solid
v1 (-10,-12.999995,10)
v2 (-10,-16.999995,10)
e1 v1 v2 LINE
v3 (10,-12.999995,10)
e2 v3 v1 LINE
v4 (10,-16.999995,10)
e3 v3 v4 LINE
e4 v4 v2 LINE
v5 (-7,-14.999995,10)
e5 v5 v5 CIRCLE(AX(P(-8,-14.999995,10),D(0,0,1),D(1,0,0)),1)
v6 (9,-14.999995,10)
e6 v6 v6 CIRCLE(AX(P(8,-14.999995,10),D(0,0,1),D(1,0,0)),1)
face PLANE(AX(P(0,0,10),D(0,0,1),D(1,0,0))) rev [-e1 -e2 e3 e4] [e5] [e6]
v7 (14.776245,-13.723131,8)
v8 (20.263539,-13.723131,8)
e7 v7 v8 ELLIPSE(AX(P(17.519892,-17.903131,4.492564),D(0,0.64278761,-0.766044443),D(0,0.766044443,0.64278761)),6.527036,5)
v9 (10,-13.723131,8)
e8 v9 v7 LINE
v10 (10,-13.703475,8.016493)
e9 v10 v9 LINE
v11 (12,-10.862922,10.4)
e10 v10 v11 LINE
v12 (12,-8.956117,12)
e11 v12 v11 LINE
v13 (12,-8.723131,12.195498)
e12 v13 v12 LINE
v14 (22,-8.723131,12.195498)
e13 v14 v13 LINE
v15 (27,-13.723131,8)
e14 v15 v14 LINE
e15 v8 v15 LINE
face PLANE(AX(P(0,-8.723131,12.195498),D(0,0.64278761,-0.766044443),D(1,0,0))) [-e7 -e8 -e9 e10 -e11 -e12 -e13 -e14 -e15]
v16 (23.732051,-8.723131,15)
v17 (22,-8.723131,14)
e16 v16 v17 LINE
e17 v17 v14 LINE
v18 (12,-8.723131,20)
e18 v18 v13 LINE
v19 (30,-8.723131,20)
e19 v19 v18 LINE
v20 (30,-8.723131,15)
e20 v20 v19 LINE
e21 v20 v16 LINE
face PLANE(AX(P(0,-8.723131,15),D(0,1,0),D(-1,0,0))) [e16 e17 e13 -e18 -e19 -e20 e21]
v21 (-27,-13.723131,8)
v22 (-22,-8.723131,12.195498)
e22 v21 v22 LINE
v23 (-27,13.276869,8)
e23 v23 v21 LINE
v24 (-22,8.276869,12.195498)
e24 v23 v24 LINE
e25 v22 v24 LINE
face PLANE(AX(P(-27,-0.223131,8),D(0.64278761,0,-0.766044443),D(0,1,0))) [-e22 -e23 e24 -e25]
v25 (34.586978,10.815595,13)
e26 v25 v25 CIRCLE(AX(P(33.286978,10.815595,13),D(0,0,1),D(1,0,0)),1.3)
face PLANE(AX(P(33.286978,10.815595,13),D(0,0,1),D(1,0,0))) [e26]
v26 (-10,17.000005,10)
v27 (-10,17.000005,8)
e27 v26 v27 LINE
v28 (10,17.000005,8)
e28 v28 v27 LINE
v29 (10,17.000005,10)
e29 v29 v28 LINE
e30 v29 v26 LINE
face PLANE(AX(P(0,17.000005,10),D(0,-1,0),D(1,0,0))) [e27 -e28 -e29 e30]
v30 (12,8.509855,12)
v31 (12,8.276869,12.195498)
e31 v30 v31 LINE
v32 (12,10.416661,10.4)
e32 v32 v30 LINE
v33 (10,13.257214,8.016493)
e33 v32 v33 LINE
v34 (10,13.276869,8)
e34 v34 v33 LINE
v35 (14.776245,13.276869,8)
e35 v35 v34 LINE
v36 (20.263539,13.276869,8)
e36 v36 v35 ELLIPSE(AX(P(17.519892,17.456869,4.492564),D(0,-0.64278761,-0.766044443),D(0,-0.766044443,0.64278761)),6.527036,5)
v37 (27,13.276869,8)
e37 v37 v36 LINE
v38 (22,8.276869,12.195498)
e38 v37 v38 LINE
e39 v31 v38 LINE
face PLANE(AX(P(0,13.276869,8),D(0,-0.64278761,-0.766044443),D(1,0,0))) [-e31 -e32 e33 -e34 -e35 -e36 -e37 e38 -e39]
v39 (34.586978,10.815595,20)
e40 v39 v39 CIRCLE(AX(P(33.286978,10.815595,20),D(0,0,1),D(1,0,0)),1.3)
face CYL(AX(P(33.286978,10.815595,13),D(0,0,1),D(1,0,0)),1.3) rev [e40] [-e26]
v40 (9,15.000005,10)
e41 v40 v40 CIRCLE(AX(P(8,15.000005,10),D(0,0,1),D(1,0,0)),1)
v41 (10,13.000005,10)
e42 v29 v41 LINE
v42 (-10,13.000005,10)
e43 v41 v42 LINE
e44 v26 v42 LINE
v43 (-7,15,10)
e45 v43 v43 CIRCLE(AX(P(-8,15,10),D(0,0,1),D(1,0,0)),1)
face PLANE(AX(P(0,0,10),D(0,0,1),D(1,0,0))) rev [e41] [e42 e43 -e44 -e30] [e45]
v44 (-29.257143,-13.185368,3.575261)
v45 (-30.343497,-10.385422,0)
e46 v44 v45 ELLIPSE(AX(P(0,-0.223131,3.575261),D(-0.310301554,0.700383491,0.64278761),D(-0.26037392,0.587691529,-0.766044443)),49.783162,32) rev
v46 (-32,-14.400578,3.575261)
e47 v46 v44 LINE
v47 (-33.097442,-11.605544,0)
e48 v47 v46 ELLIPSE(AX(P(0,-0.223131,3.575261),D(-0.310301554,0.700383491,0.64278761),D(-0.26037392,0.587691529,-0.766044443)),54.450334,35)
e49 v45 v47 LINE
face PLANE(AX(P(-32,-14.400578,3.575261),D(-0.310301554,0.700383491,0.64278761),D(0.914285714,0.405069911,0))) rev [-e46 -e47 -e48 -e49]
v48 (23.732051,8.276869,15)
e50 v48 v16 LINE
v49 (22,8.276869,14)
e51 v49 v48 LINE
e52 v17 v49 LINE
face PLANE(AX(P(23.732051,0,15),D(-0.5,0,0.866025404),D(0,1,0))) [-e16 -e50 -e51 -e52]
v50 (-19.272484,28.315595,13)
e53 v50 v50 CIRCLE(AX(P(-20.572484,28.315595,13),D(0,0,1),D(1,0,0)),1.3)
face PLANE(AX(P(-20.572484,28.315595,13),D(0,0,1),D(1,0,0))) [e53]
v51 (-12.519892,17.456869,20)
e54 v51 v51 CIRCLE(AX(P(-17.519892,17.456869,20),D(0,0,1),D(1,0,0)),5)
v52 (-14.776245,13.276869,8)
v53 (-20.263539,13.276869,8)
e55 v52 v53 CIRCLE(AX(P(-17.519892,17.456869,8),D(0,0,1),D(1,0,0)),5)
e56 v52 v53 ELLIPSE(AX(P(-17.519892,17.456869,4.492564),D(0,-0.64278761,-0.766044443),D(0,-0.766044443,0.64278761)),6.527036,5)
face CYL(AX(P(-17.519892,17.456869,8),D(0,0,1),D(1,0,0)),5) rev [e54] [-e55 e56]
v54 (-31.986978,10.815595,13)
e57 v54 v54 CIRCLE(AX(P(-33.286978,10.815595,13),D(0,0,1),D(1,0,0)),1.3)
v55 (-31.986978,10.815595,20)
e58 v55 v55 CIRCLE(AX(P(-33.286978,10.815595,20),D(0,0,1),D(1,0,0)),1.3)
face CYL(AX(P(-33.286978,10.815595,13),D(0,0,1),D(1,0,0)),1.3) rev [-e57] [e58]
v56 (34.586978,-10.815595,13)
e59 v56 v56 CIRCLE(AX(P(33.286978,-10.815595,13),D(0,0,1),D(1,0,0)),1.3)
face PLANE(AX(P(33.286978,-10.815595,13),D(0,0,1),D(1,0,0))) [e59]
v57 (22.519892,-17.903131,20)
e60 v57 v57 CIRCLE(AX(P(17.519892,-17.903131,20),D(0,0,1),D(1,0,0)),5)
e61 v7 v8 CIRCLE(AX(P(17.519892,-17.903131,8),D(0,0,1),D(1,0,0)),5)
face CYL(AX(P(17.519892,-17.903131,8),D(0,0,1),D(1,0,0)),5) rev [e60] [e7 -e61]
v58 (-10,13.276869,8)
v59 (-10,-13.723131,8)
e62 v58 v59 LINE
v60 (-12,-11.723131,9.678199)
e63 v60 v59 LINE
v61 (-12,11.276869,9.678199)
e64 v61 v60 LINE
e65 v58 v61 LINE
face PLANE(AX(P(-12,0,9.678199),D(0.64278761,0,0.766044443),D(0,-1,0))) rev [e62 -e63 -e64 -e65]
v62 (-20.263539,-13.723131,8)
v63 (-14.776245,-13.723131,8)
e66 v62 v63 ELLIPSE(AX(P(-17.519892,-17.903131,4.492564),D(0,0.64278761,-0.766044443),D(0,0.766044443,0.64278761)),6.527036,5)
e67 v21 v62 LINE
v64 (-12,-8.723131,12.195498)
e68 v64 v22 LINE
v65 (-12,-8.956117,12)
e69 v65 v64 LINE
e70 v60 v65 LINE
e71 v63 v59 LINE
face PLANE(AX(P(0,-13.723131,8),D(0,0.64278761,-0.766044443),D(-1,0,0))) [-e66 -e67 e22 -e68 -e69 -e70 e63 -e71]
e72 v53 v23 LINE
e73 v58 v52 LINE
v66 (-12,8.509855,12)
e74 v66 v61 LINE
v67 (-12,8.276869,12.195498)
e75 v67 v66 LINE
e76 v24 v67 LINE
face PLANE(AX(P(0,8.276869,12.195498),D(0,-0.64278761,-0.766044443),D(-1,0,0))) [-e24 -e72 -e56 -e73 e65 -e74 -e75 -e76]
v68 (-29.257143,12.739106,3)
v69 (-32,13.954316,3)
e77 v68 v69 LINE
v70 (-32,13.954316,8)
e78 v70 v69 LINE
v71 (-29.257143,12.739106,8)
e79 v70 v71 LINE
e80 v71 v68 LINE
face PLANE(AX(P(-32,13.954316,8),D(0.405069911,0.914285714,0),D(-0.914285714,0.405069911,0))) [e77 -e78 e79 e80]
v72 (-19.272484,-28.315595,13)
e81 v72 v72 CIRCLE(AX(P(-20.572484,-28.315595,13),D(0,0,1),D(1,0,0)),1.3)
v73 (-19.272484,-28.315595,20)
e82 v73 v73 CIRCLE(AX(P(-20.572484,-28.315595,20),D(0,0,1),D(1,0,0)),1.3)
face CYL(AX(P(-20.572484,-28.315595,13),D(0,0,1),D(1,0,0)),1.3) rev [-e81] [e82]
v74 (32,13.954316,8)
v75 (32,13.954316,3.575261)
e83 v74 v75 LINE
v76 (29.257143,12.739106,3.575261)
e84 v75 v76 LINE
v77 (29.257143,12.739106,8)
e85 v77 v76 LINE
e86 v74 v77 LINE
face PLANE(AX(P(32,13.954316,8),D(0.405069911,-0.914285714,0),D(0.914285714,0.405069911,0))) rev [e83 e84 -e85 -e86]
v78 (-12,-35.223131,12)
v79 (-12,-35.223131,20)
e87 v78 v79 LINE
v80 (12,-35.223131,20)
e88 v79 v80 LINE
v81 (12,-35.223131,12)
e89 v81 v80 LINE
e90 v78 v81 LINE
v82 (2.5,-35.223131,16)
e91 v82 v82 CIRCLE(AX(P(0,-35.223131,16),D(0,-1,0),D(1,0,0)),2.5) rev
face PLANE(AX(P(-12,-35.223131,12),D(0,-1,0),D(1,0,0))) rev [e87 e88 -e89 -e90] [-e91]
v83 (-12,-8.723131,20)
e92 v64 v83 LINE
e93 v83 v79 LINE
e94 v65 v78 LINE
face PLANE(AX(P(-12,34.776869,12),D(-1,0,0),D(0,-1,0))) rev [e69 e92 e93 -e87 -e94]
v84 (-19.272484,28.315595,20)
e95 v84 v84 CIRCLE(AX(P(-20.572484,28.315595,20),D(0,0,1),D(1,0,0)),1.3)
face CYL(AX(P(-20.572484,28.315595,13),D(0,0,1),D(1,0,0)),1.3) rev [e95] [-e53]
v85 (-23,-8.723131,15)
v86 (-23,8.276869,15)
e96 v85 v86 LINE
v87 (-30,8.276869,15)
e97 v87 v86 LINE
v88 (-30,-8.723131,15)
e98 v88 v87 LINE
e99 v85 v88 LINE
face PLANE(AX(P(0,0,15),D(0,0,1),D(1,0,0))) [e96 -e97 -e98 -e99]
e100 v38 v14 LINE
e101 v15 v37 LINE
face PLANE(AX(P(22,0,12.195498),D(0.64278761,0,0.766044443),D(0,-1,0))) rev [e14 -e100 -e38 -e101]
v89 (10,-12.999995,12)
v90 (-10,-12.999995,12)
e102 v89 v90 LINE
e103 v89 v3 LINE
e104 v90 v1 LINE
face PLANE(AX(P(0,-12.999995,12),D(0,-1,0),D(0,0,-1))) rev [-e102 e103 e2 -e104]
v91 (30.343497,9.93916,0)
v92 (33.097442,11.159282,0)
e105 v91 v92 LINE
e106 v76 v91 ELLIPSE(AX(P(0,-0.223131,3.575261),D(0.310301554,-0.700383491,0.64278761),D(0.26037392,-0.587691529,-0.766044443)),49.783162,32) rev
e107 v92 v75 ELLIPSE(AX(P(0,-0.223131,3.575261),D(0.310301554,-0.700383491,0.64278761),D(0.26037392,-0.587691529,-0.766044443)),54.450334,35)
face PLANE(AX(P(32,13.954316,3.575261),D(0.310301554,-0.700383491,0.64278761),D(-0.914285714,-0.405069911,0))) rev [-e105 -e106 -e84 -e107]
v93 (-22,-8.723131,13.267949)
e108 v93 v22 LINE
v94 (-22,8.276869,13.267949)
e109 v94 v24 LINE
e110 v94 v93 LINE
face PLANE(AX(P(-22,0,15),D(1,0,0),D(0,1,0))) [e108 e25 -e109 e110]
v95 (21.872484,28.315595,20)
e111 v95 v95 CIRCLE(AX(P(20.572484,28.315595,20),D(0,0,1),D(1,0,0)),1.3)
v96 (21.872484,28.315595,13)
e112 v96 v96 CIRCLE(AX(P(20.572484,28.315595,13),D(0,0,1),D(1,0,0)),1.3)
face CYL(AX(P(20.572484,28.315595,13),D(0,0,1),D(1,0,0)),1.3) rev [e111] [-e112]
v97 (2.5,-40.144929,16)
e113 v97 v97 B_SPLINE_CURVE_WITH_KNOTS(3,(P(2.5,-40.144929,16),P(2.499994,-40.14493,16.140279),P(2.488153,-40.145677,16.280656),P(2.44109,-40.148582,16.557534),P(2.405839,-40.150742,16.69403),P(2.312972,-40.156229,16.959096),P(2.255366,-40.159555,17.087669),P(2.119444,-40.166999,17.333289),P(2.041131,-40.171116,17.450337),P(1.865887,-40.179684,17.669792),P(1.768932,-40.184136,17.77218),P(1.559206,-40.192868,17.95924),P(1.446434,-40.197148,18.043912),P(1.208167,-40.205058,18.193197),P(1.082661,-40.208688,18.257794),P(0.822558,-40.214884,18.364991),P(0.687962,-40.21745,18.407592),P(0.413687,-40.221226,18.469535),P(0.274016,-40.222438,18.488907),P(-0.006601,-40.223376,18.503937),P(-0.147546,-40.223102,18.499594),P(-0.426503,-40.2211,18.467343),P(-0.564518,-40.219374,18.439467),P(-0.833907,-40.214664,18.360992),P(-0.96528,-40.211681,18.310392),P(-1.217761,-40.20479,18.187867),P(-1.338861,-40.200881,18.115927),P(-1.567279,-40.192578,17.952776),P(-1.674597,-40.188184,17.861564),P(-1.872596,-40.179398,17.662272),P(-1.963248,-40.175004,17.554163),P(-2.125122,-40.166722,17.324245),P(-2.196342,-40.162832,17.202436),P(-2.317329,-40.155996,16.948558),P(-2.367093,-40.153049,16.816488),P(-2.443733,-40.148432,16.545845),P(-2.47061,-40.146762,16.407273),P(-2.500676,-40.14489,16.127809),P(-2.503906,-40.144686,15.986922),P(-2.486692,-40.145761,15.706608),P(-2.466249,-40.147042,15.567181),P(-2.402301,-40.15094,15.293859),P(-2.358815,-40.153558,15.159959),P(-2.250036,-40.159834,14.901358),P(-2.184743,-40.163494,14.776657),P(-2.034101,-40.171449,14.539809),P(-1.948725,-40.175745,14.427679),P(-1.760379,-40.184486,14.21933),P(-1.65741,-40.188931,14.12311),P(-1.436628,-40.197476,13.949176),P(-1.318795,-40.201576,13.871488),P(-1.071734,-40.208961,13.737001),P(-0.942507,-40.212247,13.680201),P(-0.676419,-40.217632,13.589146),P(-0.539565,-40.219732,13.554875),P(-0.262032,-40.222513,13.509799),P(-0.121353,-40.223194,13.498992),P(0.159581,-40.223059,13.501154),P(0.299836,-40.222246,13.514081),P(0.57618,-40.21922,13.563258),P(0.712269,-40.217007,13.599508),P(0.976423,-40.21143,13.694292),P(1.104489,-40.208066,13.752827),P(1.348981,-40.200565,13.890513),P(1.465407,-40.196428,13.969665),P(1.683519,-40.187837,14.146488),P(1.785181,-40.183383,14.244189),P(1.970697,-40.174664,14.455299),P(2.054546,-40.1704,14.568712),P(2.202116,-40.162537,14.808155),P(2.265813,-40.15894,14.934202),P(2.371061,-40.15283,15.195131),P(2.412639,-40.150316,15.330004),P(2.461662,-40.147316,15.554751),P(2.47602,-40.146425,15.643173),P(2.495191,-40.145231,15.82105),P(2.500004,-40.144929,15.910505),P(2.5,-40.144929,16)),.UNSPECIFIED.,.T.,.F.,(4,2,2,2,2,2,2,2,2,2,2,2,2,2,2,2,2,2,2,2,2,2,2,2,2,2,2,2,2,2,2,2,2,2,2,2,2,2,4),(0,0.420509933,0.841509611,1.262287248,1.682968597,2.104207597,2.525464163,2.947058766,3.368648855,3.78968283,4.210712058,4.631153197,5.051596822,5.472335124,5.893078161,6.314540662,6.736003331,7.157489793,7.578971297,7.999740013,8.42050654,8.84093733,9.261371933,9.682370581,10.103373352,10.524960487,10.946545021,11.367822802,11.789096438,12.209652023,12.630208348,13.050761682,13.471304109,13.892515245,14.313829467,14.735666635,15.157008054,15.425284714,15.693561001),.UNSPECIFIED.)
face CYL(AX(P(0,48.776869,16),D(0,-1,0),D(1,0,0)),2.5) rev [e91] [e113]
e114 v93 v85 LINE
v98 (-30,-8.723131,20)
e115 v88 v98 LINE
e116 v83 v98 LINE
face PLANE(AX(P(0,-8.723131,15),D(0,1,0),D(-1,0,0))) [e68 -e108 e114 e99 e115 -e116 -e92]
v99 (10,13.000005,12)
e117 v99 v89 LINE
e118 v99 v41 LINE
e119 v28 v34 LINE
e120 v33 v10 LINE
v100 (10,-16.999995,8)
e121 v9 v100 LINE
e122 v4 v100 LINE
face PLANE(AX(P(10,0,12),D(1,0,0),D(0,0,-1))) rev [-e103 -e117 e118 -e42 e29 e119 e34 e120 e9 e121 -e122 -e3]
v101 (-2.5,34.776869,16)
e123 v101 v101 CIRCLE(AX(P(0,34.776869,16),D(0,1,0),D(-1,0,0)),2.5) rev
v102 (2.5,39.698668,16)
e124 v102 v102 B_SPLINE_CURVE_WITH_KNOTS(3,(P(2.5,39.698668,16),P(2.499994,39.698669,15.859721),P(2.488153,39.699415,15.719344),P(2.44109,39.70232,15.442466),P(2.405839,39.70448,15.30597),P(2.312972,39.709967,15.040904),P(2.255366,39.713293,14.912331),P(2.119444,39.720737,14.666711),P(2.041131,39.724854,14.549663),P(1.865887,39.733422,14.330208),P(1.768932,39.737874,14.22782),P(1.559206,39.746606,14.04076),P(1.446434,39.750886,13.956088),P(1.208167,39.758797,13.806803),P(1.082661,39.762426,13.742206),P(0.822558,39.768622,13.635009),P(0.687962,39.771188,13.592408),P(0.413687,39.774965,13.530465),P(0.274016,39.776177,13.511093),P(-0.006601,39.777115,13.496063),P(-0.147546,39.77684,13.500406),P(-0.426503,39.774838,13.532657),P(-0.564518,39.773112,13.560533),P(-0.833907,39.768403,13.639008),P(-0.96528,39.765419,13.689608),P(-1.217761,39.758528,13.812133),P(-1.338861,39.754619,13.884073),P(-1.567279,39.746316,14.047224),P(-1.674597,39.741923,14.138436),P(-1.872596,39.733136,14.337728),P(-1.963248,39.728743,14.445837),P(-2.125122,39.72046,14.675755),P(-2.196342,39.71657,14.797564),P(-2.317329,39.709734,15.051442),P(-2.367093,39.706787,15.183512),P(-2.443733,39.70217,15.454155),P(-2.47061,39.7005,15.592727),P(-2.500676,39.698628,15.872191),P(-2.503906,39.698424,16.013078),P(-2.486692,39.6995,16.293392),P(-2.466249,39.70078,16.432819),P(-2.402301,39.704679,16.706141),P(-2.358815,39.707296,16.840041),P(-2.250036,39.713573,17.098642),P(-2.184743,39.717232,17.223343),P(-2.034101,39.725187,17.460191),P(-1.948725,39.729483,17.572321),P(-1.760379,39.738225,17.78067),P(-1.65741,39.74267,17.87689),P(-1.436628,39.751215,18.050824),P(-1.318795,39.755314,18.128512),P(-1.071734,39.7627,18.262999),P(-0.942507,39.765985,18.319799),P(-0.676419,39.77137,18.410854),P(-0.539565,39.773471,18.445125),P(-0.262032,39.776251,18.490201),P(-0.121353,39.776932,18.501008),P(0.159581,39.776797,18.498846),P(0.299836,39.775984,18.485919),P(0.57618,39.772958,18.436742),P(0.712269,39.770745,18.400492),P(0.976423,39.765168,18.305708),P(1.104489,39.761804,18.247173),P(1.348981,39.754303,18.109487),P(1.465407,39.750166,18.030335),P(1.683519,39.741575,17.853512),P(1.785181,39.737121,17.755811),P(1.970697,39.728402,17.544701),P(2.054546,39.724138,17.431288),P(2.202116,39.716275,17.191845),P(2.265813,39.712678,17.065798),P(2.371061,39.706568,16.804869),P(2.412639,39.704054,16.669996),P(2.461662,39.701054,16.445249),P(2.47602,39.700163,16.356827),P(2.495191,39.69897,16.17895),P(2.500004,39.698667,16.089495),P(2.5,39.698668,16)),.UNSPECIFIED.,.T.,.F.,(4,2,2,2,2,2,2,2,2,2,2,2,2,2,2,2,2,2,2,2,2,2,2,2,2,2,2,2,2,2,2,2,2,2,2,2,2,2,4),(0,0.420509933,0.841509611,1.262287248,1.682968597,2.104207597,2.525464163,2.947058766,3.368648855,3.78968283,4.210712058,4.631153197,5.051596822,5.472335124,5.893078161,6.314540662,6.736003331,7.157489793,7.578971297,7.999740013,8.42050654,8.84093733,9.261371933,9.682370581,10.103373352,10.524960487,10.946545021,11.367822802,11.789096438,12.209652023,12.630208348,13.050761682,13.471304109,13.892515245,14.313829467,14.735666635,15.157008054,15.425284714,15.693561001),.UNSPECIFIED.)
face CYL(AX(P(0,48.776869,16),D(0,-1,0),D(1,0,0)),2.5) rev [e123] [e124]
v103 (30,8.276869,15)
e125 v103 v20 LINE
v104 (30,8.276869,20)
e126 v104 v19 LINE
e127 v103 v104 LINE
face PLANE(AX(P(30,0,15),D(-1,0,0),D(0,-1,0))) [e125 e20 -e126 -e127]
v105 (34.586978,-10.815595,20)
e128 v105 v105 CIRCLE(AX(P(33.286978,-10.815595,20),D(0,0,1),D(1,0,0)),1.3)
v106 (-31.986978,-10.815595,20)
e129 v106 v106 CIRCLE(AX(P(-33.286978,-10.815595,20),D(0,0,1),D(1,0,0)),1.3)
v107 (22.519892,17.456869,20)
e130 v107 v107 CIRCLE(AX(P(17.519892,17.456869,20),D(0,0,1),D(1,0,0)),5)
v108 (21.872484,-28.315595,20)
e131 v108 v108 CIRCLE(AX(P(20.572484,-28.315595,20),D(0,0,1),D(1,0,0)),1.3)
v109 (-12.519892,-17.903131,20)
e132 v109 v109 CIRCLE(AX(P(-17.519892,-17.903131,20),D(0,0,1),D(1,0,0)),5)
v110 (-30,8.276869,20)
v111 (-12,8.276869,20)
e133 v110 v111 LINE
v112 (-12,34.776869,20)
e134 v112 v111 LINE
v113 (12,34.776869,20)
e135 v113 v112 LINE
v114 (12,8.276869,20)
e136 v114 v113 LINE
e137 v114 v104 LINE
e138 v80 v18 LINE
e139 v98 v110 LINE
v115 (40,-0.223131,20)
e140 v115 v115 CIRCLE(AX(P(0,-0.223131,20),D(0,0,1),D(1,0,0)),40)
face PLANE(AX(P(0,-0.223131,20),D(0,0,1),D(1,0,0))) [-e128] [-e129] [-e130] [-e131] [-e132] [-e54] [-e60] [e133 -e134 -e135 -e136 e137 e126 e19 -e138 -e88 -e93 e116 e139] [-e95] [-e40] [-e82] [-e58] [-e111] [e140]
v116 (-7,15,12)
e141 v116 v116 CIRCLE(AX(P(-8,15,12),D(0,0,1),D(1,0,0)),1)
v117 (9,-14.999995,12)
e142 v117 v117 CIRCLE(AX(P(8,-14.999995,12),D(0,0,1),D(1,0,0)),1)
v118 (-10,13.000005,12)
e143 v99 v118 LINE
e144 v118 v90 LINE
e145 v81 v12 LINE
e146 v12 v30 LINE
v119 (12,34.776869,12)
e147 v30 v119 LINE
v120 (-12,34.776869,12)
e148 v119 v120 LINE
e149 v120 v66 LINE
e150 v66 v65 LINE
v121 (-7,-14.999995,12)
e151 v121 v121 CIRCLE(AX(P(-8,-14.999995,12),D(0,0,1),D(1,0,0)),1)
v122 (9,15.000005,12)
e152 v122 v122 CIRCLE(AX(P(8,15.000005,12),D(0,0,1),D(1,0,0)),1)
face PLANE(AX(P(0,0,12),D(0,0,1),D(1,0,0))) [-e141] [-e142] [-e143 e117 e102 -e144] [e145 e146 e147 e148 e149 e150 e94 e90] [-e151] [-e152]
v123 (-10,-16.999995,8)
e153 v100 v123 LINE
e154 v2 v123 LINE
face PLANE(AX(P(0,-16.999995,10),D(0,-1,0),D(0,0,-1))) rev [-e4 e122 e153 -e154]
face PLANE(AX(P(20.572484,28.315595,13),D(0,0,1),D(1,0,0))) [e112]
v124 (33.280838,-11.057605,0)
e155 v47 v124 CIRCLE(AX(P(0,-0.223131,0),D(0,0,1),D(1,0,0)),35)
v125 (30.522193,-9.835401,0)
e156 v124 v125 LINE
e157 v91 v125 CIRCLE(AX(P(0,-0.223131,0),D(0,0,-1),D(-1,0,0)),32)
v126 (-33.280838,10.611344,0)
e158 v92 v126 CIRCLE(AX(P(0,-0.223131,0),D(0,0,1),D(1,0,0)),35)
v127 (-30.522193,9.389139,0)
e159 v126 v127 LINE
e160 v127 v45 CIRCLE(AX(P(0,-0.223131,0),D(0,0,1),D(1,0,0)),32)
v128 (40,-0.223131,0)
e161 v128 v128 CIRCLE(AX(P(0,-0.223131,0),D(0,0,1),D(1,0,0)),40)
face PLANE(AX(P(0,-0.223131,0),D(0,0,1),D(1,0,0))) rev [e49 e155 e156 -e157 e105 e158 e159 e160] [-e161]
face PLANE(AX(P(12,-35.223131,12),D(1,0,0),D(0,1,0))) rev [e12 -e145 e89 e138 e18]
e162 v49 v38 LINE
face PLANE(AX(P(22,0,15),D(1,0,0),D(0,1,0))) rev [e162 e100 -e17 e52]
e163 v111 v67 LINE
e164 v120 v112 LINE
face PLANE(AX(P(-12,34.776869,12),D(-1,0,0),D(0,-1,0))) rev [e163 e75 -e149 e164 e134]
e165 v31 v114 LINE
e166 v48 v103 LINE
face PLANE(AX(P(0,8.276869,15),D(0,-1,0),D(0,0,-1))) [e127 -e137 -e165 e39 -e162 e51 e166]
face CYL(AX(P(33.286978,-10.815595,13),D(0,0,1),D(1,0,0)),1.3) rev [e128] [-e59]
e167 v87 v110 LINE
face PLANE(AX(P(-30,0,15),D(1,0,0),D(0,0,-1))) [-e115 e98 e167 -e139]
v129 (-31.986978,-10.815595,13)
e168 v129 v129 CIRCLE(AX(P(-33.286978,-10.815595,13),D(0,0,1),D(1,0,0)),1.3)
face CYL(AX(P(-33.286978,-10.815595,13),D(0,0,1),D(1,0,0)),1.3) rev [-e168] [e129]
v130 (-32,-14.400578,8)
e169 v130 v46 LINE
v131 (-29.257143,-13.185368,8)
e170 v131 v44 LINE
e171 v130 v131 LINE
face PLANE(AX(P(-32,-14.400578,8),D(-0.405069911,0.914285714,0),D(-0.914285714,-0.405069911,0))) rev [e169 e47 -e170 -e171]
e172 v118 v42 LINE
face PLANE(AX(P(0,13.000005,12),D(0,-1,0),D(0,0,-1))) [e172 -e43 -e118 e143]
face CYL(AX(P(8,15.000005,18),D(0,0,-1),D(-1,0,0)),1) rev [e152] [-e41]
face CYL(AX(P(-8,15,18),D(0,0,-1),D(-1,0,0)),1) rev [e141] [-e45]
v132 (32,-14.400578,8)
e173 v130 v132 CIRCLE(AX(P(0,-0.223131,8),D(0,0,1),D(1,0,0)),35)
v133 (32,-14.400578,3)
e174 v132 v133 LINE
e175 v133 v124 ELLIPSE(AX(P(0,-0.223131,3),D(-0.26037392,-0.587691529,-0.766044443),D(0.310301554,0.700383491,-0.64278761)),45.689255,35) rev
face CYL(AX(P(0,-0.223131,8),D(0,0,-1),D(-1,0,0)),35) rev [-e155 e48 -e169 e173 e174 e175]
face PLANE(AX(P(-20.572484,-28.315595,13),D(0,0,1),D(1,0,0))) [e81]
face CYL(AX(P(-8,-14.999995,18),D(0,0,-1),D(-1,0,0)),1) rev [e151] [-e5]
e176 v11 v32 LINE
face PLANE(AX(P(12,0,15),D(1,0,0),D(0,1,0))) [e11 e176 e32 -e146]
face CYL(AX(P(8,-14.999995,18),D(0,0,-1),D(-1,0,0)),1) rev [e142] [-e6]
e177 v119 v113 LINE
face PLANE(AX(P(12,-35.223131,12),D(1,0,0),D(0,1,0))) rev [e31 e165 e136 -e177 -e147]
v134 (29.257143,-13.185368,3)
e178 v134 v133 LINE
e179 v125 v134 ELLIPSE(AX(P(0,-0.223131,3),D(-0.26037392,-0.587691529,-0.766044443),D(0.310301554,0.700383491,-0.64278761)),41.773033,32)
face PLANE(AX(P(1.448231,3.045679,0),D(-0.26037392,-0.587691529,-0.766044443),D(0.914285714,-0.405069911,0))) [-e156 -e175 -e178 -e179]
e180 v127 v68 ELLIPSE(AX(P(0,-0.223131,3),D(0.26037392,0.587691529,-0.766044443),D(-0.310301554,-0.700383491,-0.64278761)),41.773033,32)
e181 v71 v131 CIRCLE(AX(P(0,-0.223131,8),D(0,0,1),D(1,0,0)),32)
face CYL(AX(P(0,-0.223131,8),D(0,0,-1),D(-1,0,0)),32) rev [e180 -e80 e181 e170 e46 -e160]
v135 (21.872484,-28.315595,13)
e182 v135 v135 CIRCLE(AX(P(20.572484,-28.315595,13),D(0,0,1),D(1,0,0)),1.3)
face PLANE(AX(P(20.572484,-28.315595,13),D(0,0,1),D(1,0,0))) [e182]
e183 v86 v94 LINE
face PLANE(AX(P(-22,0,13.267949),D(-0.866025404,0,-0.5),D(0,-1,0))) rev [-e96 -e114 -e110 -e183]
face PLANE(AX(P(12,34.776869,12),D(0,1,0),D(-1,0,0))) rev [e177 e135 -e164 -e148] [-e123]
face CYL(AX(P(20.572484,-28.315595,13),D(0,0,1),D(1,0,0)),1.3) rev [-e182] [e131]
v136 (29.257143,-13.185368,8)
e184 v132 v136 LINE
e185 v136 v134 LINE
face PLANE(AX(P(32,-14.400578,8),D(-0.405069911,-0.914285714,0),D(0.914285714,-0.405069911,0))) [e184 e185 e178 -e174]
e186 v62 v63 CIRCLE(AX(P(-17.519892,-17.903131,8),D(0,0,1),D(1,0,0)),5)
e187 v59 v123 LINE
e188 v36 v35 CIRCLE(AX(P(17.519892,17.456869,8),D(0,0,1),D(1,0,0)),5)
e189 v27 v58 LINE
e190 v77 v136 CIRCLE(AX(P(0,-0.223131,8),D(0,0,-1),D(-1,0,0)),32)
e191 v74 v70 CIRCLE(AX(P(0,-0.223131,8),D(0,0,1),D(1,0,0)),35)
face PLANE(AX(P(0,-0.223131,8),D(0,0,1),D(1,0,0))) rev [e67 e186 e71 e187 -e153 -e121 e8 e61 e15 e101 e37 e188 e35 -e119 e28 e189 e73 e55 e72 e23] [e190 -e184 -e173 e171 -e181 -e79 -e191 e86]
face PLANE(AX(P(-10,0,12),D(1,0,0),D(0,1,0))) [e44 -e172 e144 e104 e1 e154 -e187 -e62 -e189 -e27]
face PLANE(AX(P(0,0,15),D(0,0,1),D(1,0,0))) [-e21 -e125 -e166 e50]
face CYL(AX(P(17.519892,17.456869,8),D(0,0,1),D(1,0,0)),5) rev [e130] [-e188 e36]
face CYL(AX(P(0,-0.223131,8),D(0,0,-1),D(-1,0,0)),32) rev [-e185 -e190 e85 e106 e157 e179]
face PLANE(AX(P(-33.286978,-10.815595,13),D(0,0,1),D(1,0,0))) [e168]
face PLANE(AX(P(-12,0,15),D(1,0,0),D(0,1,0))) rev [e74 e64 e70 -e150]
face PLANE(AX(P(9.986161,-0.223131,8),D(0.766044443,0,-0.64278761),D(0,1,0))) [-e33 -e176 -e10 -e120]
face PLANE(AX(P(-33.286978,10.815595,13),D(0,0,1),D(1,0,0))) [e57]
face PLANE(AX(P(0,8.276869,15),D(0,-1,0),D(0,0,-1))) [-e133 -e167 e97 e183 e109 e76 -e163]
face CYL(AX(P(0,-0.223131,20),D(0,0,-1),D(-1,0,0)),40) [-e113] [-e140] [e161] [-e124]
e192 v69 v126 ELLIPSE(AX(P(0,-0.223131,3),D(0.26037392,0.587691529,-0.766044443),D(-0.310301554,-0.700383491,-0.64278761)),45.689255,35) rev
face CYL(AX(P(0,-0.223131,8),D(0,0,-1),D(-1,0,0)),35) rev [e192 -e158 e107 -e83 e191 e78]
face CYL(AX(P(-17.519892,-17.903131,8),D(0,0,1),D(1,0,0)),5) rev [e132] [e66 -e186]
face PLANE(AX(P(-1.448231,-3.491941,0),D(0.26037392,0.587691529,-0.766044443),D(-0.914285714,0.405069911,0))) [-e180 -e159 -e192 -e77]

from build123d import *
from OCP.BRepAlgoAPI import BRepAlgoAPI_Cut
from OCP.TopTools import TopTools_ListOfShape
from OCP.BRepFilletAPI import BRepFilletAPI_MakeChamfer

# Parameters (mm, degrees)
SKETCH1_R                = 40
BOSS_EXTRUDE1_DEPTH      = 20
CUT_EXTRUDE1_DEPTH       = 8
CUT_EXTRUDE6_DEPTH       = 5
CUT_EXTRUDE7_DEPTH       = 8
CUT_EXTRUDE9_DEPTH       = 4
SKETCH15_AGAIN_R         = 1.0000000000000018
SKETCH15_AGAIN_R_2       = 1.0000000000000009
CUT_EXTRUDE12_DEPTH      = 2
SKETCH25_R               = 1.2999999999999987
SKETCH25_R_2             = 1.3000000000000014
SKETCH25_R_3             = 1.300000000000001
SKETCH25_R_4             = 1.2999999999999998
SKETCH25_R_5             = 1.3000000000000003
SKETCH25_R_6             = 1.2999999999999994
SKETCH25_R_7             = 1.2999999999999985
CUT_EXTRUDE19_DEPTH      = 7
SKETCH28_R               = 1.0000000000000018
CUT_EXTRUDE20_DEPTH      = 10
CUT_EXTRUDE21_DEPTH      = 7
CHAMFER1_SIZE            = 3
CHAMFER1_SIZE2           = 3.5752607777826437
SKETCH16_R               = 4.999999999999997
SKETCH16_R_2             = 5.000000000000001
SKETCH16_R_3             = 5.0000000000000036
CUT_EXTRUDE22_DEPTH      = 12
CHAMFER2_START           = -27
CHAMFER2_DEPTH           = 15
CHAMFER2_START_2         = 12
CHAMFER2_2_DEPTH         = 15
CHAMFER2_START_3         = -8.72313087
CHAMFER2_3_DEPTH         = 17
CHAMFER2_START_4         = -13.72313087
CHAMFER2_4_DEPTH         = 27
CUT_EXTRUDE23_DEPTH      = 84.00000000000004
CUT_EXTRUDE23_DEPTH_BACK = 90
CHAMFER6_SIZE2           = 2
CHAMFER6_SIZE            = 1.678199262
CHAMFER7_SIZE            = 2.4
CHAMFER7_SIZE_2          = 2.013839115
CHAMFER8_SIZE            = 1
CHAMFER8_SIZE2           = 1.7320508075688867


with BuildPart() as part:
    # Sketch1 → Boss-Extrude1 (new body)
    with BuildSketch(Plane.XY):
        with Locations((0, -0.2231308703956117)):
            Circle(SKETCH1_R)
    extrude(amount=BOSS_EXTRUDE1_DEPTH)

    # Sketch1<3> → Cut-Extrude1 (cut)
    with BuildSketch(Plane.XY):
        with BuildLine():
            Line((32, -14.400577749153458), (29.25714285714285, -13.185368016688496))
            ThreePointArc((29.25714285714285, -13.185368016688496), (32, -0.22313087039560991), (29.25714285714285, 12.739106275897278))
            Line((29.25714285714285, 12.739106275897278), (32, 13.954316008362234))
            ThreePointArc((32, 13.954316008362234), (-5.63e-15, 34.77686912960439), (-32.00000000000001, 13.954316008362225))
            Line((-32.00000000000001, 13.954316008362225), (-29.257142857142856, 12.739106275897262))
            ThreePointArc((-29.257142857142856, 12.739106275897262), (-32, -0.22313087039560778), (-29.257142857142856, -13.185368016688487))
            Line((-29.257142857142856, -13.185368016688487), (-32.00000000000001, -14.400577749153445))
            ThreePointArc((-32.00000000000001, -14.400577749153445), (-5.63e-15, -35.22313087039562), (32, -14.400577749153458))
        make_face()
    extrude(amount=CUT_EXTRUDE1_DEPTH, mode=Mode.SUBTRACT)

    # Sketch8 → Cut-Extrude6 (cut)
    with BuildSketch(Plane.XY.offset(20)):
        Polygon((-29.999999999999993, 8.276869129604389), (29.99999999999994, 8.276869129604389), (29.999999999999943, -8.723130870395606), (-29.999999999999993, -8.723130870395613), align=None)
    extrude(amount=-CUT_EXTRUDE6_DEPTH, mode=Mode.SUBTRACT)

    # Sketch12 → Cut-Extrude7 (cut)
    with BuildSketch(Plane.XY.offset(20)):
        Polygon((12, 34.77686912960441), (-12, 34.7768691296044), (-11.999999999999991, -35.22313087039561), (12.000000000000034, -35.2231308703956), align=None)
    extrude(amount=-CUT_EXTRUDE7_DEPTH, mode=Mode.SUBTRACT)

    # Sketch15 → Cut-Extrude9 (cut)
    with BuildSketch(Plane.XY.offset(8)):
        Polygon((9.999999999999973, 13.000004746174419), (-10.000000000000009, 13.000004746174419), (-10.000000000000016, -12.999995253825592), (9.99999999999998, -12.999995253825592), align=None)
    extrude(amount=CUT_EXTRUDE9_DEPTH, mode=Mode.SUBTRACT)

    # Sketch15 again → Cut-Extrude12 (cut)
    # profile 1 of 4: a face of its own
    with BuildSketch(Plane.XY.offset(8)):
        Polygon((9.999999999999982, 13.000004746174419), (9.999999999999982, 17.00000474617441), (-1.776e-14, 17.00000474617441), (-1.735e-14, 13.000004746174419), align=None)
        with Locations((7.999999999999976, 15.000004746174419)):
            Circle(SKETCH15_AGAIN_R, mode=Mode.SUBTRACT)
    # profile 2 of 4: a face of its own
    with BuildSketch(Plane.XY.offset(8)):
        Polygon((-1.735e-14, 13.000004746174419), (-1.735e-14, 17.00000474617442), (-10.000000000000018, 17.000004746174415), (-10.00000000000002, 13.000004746174419), align=None)
        with Locations((-8.00000000000001, 15.000004746174419)):
            Circle(SKETCH15_AGAIN_R_2, mode=Mode.SUBTRACT)
    # profile 3 of 4: a face of its own
    with BuildSketch(Plane.XY.offset(8)):
        Polygon((9.999999999999982, -16.99999525382559), (9.999999999999982, -12.999995253825592), (-8.88e-15, -12.999995253825592), (-1.735e-14, -16.99999525382559), align=None)
        with Locations((7.999999999999976, -14.999995253825588)):
            Circle(SKETCH15_AGAIN_R, mode=Mode.SUBTRACT)
    # profile 4 of 4: a face of its own
    with BuildSketch(Plane.XY.offset(8)):
        Polygon((-1.735e-14, -16.99999525382559), (-1.735e-14, -12.999995253825592), (-10.000000000000016, -12.999995253825592), (-10.000000000000018, -16.999995253825585), align=None)
        with Locations((-8.00000000000001, -14.999995253825588)):
            Circle(SKETCH15_AGAIN_R_2, mode=Mode.SUBTRACT)
    extrude(amount=CUT_EXTRUDE12_DEPTH, mode=Mode.SUBTRACT)

    # Sketch25 → Cut-Extrude19 (cut)
    with BuildSketch(Plane.XY.offset(20)):
        with Locations((20.572483830236603, 28.31559480312315)):
            Circle(SKETCH25_R)
        with Locations((33.286978070330434, 10.815594803123071)):
            Circle(SKETCH25_R_2)
        with Locations((33.286978070330356, -10.815594803123314)):
            Circle(SKETCH25_R_3)
        with Locations((20.572483830236415, -28.315594803123286)):
            Circle(SKETCH25_R_4)
        with Locations((-20.572483830236816, -28.315594803122988)):
            Circle(SKETCH25_R)
        with Locations((-33.286978070330484, -10.815594803122844)):
            Circle(SKETCH25_R_5)
        with Locations((-33.28697807033027, 10.815594803123542)):
            Circle(SKETCH25_R_6)
        with Locations((-20.57248383023619, 28.31559480312344)):
            Circle(SKETCH25_R_7)
    extrude(amount=-CUT_EXTRUDE19_DEPTH, mode=Mode.SUBTRACT)


with BuildPart() as cut_extrude20_tool:
    # Sketch28 → Cut-Extrude20 (new body)
    with BuildSketch(Plane(origin=(0, 0, 8), x_dir=(-1, 0, 0), z_dir=(0, 0, -1))):
        with Locations(Location((-7.999999999999976, -14.999995253825588, 0), (0, 0, 180))):
            Circle(SKETCH28_R)
        with Locations(Location((8.00000000000001, -14.999995253825588, 0), (0, 0, 180))):
            Circle(SKETCH28_R)
        with Locations(Location((-7.999999999999976, 15.000004746174419, 0), (0, 0, 180))):
            Circle(SKETCH28_R)
        with Locations(Location((8.00000000000001, 15.000000000000007, 0), (0, 0, 180))):
            Circle(SKETCH28_R)
    extrude(amount=-CUT_EXTRUDE20_DEPTH)


with BuildPart() as part_1:
    add(part.part)

    # Cut-Extrude20: cut by cut_extrude20_tool, with a tolerance
    cut_extrude20_stock = TopTools_ListOfShape()
    cut_extrude20_stock.Append(part_1.part.wrapped)
    cut_extrude20_tools = TopTools_ListOfShape()
    cut_extrude20_tools.Append(cut_extrude20_tool.part.wrapped)
    cut_extrude20_cut = BRepAlgoAPI_Cut()
    cut_extrude20_cut.SetArguments(cut_extrude20_stock)
    cut_extrude20_cut.SetTools(cut_extrude20_tools)
    cut_extrude20_cut.SetFuzzyValue(0.00001)
    cut_extrude20_cut.Build()
    add(Compound.cast(cut_extrude20_cut.Shape()).solids(), mode=Mode.REPLACE)

    # Sketch30 → Cut-Extrude21 (cut)
    with BuildSketch(Plane.XY.offset(8)):
        Polygon((-21.999999999999996, -0.22313087039560822), (-11.999999999999993, -0.22313087039560822), (-11.999999999999995, 8.276869129604389), (-21.999999999999996, 8.27686912960439), align=None)
        Polygon((-11.999999999999993, -8.723130870395611), (-11.999999999999995, -0.22313087039560742), (-21.999999999999996, -0.22313087039560822), (-21.999999999999993, -8.72313087039561), align=None)
        Polygon((22.000000000000007, -0.22313087039560822), (12.000000000000007, -0.22313087039560822), (12.000000000000004, -8.723130870395607), (22.000000000000007, -8.723130870395606), align=None)
        Polygon((12.000000000000002, 8.276869129604393), (12.000000000000004, -0.22313087039560742), (22.000000000000007, -0.22313087039560822), (22.000000000000004, 8.276869129604396), align=None)
    extrude(amount=CUT_EXTRUDE21_DEPTH, mode=Mode.SUBTRACT)

    # Chamfer1: one chamfer whose edges measure the first distance from different faces: ONE call of the kernel's chamfer builder (chamfer() names one face for all edges)
    chamfer1_edges_1 = [part_1.edges().sort_by_distance(p)[0] for p in [
        (30.628571428571426, -13.792972882920978, 0),
    ]]
    chamfer1_side_1 = [part_1.faces().sort_by_distance(p)[0] for p in [
        (30.62857142857142, -13.792972882920976, 4),
    ]]
    chamfer1_edges_2 = [part_1.edges().sort_by_distance(p)[0] for p in [
        (30.628571428571426, 13.346711142129756, 0),
        (-30.628571428571433, -13.792972882920967, 0),
    ]]
    chamfer1_side_2 = [part_1.faces().sort_by_distance(p)[0] for p in [
        (-38.868629150101526, -0.22313087039560695, 0),
    ]]
    chamfer1_edges_3 = [part_1.edges().sort_by_distance(p)[0] for p in [
        (-30.628571428571433, 13.346711142129744, 0),
    ]]
    chamfer1_side_3 = [part_1.faces().sort_by_distance(p)[0] for p in [
        (-30.628571428571433, 13.346711142129744, 4),
    ]]
    chamfer1 = BRepFilletAPI_MakeChamfer(part_1.part.solid().wrapped)
    for e in chamfer1_edges_1:
        chamfer1.Add(CHAMFER1_SIZE, CHAMFER1_SIZE2, e.wrapped, chamfer1_side_1[0].wrapped)  # the first distance lies on this face
    for e in chamfer1_edges_2:
        chamfer1.Add(CHAMFER1_SIZE, CHAMFER1_SIZE2, e.wrapped, chamfer1_side_2[0].wrapped)  # the first distance lies on this face
    for e in chamfer1_edges_3:
        chamfer1.Add(CHAMFER1_SIZE, CHAMFER1_SIZE2, e.wrapped, chamfer1_side_3[0].wrapped)  # the first distance lies on this face
    add(Compound.cast(chamfer1.Shape()), mode=Mode.REPLACE)

    # Sketch16 → Cut-Extrude22 (cut)
    with BuildSketch(Plane.XY.offset(20)):
        with Locations((17.51989217811493, 17.45686912960439)):
            Circle(SKETCH16_R)
        with Locations((17.519892178114794, -17.903130870395614)):
            Circle(SKETCH16_R_2)
        with Locations((-17.519892178115043, -17.903130870395614)):
            Circle(SKETCH16_R_2)
        with Locations((-17.519892178114677, 17.45686912960439)):
            Circle(SKETCH16_R_3)
    extrude(amount=-CUT_EXTRUDE22_DEPTH, mode=Mode.SUBTRACT)

    # Chamfer2: read off the stored shape, not the designer's step
    # Chamfer2 outline → Chamfer2 (cut)
    with BuildSketch(Plane.YZ.offset(CHAMFER2_START)):
        Polygon((8.27686913, 12.195498156), (8.27686913, 8), (13.27686913, 8), align=None)
        Polygon((-8.72313087, 12.195498156), (-13.72313087, 8), (-8.72313087, 8), align=None)
    extrude(amount=CHAMFER2_DEPTH, mode=Mode.SUBTRACT)

    # Chamfer2 2 outline → Chamfer2 2 (cut)
    with BuildSketch(Plane.YZ.offset(CHAMFER2_START_2)):
        Polygon((8.27686913, 12.195498156), (8.27686913, 8), (13.27686913, 8), align=None)
        Polygon((-8.72313087, 12.195498156), (-13.72313087, 8), (-8.72313087, 8), align=None)
    extrude(amount=CHAMFER2_2_DEPTH, mode=Mode.SUBTRACT)

    # Chamfer2 3 outline → Chamfer2 3 (cut)
    with BuildSketch(Plane(origin=(0, 0, 0), x_dir=(1, 0, 0), z_dir=(0, 1, 0)).offset(CHAMFER2_START_3)):
        Polygon((22, -8), (22, -12.195498156), (27, -8), align=None)
        Polygon((-22, -12.195498156), (-22, -8), (-27, -8), align=None)
    extrude(amount=CHAMFER2_3_DEPTH, mode=Mode.SUBTRACT)

    # Chamfer2 4 outline → Chamfer2 4 (add)
    with BuildSketch(Plane(origin=(0, 0, 0), x_dir=(1, 0, 0), z_dir=(0, 1, 0)).offset(CHAMFER2_START_4)):
        Polygon((27, -8), (22, -12.195498156), (22, -14), (29, -14), (29, -8), align=None)
        Polygon((-22, -12.195498156), (-27, -8), (-29, -8), (-29, -14), (-22, -14), align=None)
    extrude(amount=CHAMFER2_4_DEPTH)

    # Sketch31 → Cut-Extrude23 (cut, two sides: drawn at the far end of the back side and taken through both)
    with BuildSketch(Plane(origin=(1.018e-14, -35.22313087039561, 0), x_dir=(1, 2.9e-16, 0), z_dir=(-2.9e-16, 1, 0)).offset(-CUT_EXTRUDE23_DEPTH_BACK)):
        with BuildLine():
            ThreePointArc((-1.1e-15, -13.5), (-1.7677669529663624, -14.232233047033635), (-2.4999999999999902, -16))
            Line((-2.499999999999991, -16), (1.066e-14, -16))
            Line((1.041e-14, -16), (1.041e-14, -13.5))
        make_face()
        with BuildLine():
            Line((1.066e-14, -16), (-2.499999999999991, -16))
            ThreePointArc((-2.4999999999999902, -16), (-1.7677669529663638, -17.767766952966365), (-3.37e-15, -18.5))
            Line((1.041e-14, -18.5), (1.041e-14, -16))
        make_face()
        with BuildLine():
            Line((1.041e-14, -13.5), (1.041e-14, -16))
            Line((1.066e-14, -16), (2.5000000000000107, -16))
            ThreePointArc((2.5000000000000107, -16), (1.7677669529663755, -14.232233047033628), (-1.1e-15, -13.5))
        make_face()
        with BuildLine():
            Line((2.5000000000000107, -16), (1.066e-14, -16))
            Line((1.041e-14, -16), (1.041e-14, -18.5))
            ThreePointArc((-3.37e-15, -18.5), (1.7677669529663744, -17.767766952966376), (2.5000000000000107, -16))
        make_face()
        with BuildLine():
            ThreePointArc((-1.1e-15, -13.5), (-1.7677669529663624, -14.232233047033635), (-2.4999999999999902, -16))
            Line((-2.499999999999991, -16), (1.066e-14, -16))
            Line((1.041e-14, -16), (1.041e-14, -13.5))
        make_face()
        with BuildLine():
            Line((1.066e-14, -16), (-2.499999999999991, -16))
            ThreePointArc((-2.4999999999999902, -16), (-1.7677669529663638, -17.767766952966365), (-3.37e-15, -18.5))
            Line((1.041e-14, -18.5), (1.041e-14, -16))
        make_face()
        with BuildLine():
            Line((1.041e-14, -13.5), (1.041e-14, -16))
            Line((1.066e-14, -16), (2.5000000000000107, -16))
            ThreePointArc((2.5000000000000107, -16), (1.7677669529663755, -14.232233047033628), (-1.1e-15, -13.5))
        make_face()
        with BuildLine():
            Line((2.5000000000000107, -16), (1.066e-14, -16))
            Line((1.041e-14, -16), (1.041e-14, -18.5))
            ThreePointArc((-3.37e-15, -18.5), (1.7677669529663744, -17.767766952966376), (2.5000000000000107, -16))
        make_face()
        with BuildLine():
            ThreePointArc((-1.1e-15, -13.5), (-1.7677669529663624, -14.232233047033635), (-2.4999999999999902, -16))
            Line((-2.499999999999991, -16), (1.066e-14, -16))
            Line((1.041e-14, -16), (1.041e-14, -13.5))
        make_face()
        with BuildLine():
            Line((1.066e-14, -16), (-2.499999999999991, -16))
            ThreePointArc((-2.4999999999999902, -16), (-1.7677669529663638, -17.767766952966365), (-3.37e-15, -18.5))
            Line((1.041e-14, -18.5), (1.041e-14, -16))
        make_face()
        with BuildLine():
            Line((1.041e-14, -13.5), (1.041e-14, -16))
            Line((1.066e-14, -16), (2.5000000000000107, -16))
            ThreePointArc((2.5000000000000107, -16), (1.7677669529663755, -14.232233047033628), (-1.1e-15, -13.5))
        make_face()
        with BuildLine():
            Line((2.5000000000000107, -16), (1.066e-14, -16))
            Line((1.041e-14, -16), (1.041e-14, -18.5))
            ThreePointArc((-3.37e-15, -18.5), (1.7677669529663744, -17.767766952966376), (2.5000000000000107, -16))
        make_face()
        with BuildLine():
            ThreePointArc((-1.1e-15, -13.5), (-1.7677669529663624, -14.232233047033635), (-2.4999999999999902, -16))
            Line((-2.499999999999991, -16), (1.066e-14, -16))
            Line((1.041e-14, -16), (1.041e-14, -13.5))
        make_face()
        with BuildLine():
            Line((1.066e-14, -16), (-2.499999999999991, -16))
            ThreePointArc((-2.4999999999999902, -16), (-1.7677669529663638, -17.767766952966365), (-3.37e-15, -18.5))
            Line((1.041e-14, -18.5), (1.041e-14, -16))
        make_face()
        with BuildLine():
            Line((1.041e-14, -13.5), (1.041e-14, -16))
            Line((1.066e-14, -16), (2.5000000000000107, -16))
            ThreePointArc((2.5000000000000107, -16), (1.7677669529663755, -14.232233047033628), (-1.1e-15, -13.5))
        make_face()
        with BuildLine():
            Line((2.5000000000000107, -16), (1.066e-14, -16))
            Line((1.041e-14, -16), (1.041e-14, -18.5))
            ThreePointArc((-3.37e-15, -18.5), (1.7677669529663744, -17.767766952966376), (2.5000000000000107, -16))
        make_face()
    extrude(amount=CUT_EXTRUDE23_DEPTH + CUT_EXTRUDE23_DEPTH_BACK, mode=Mode.SUBTRACT)

    # Chamfer6
    chamfer6_edges = [part_1.edges().sort_by_distance(p)[0] for p in [
        (-12, -0.22313087000000031, 8),
    ]]
    chamfer6_side = [part_1.faces().sort_by_distance(p)[0] for p in [
        (-12, -0.22313087000000031, 8.033563985247092),
    ]]
    chamfer(chamfer6_edges, length=CHAMFER6_SIZE - 0.0001, length2=CHAMFER6_SIZE2 - 0.0001, reference=chamfer6_side[0])  # a hair under: the kernel refuses the full size

    # Chamfer7
    # the kernel refuses this chamfer: 2.4, 2.013839115 mm, written as the material it takes off along each edge
    with BuildSketch(Plane(origin=(12, 19.462643778027733, 8), x_dir=(0, 0, 1), z_dir=(0, -1, 0))) as chamfer7_piece_1_section:
        Polygon((CHAMFER7_SIZE, 0), (0, CHAMFER7_SIZE_2), (0, 0), align=None)
    chamfer7_piece_1 = extrude(amount=39.37154929605547, mode=Mode.PRIVATE)
    chamfer7_piece_1 = split(chamfer7_piece_1, bisect_by=Plane(origin=(12, 5.751081099625855, 24.340804081623677), z_dir=(0, 0.6427876096967526, -0.7660444431104081)), keep=Keep.TOP, mode=Mode.PRIVATE)
    chamfer7_piece_1 = split(chamfer7_piece_1, bisect_by=Plane(origin=(12, 16.906830701476803, 4.9541005841036405), z_dir=(0, -0.6427876096967526, -0.7660444431104081)), keep=Keep.TOP, mode=Mode.PRIVATE)
    add(chamfer7_piece_1, mode=Mode.SUBTRACT)

    # Chamfer8: one chamfer whose edges measure the first distance from different faces: ONE call of the kernel's chamfer builder (chamfer() names one face for all edges)
    chamfer8_edges_1 = [part_1.edges().sort_by_distance(p)[0] for p in [
        (-21.999999999999993, -0.2231308703956092, 15),
    ]]
    chamfer8_side_1 = [part_1.faces().sort_by_distance(p)[0] for p in [
        (-25.999999999999993, -0.22313087039561413, 15),
    ]]
    chamfer8_edges_2 = [part_1.edges().sort_by_distance(p)[0] for p in [
        (22.000000000000007, -0.22313087039560386, 15),
    ]]
    chamfer8_side_2 = [part_1.faces().sort_by_distance(p)[0] for p in [
        (22.000000000000007, -0.22313087029670353, 13.597749078),
    ]]
    chamfer8 = BRepFilletAPI_MakeChamfer(part_1.part.solid().wrapped)
    for e in chamfer8_edges_1:
        chamfer8.Add(CHAMFER8_SIZE, CHAMFER8_SIZE2, e.wrapped, chamfer8_side_1[0].wrapped)  # the first distance lies on this face
    for e in chamfer8_edges_2:
        chamfer8.Add(CHAMFER8_SIZE, CHAMFER8_SIZE2, e.wrapped, chamfer8_side_2[0].wrapped)  # the first distance lies on this face
    add(Compound.cast(chamfer8.Shape()), mode=Mode.REPLACE)


solid = part_1.part
